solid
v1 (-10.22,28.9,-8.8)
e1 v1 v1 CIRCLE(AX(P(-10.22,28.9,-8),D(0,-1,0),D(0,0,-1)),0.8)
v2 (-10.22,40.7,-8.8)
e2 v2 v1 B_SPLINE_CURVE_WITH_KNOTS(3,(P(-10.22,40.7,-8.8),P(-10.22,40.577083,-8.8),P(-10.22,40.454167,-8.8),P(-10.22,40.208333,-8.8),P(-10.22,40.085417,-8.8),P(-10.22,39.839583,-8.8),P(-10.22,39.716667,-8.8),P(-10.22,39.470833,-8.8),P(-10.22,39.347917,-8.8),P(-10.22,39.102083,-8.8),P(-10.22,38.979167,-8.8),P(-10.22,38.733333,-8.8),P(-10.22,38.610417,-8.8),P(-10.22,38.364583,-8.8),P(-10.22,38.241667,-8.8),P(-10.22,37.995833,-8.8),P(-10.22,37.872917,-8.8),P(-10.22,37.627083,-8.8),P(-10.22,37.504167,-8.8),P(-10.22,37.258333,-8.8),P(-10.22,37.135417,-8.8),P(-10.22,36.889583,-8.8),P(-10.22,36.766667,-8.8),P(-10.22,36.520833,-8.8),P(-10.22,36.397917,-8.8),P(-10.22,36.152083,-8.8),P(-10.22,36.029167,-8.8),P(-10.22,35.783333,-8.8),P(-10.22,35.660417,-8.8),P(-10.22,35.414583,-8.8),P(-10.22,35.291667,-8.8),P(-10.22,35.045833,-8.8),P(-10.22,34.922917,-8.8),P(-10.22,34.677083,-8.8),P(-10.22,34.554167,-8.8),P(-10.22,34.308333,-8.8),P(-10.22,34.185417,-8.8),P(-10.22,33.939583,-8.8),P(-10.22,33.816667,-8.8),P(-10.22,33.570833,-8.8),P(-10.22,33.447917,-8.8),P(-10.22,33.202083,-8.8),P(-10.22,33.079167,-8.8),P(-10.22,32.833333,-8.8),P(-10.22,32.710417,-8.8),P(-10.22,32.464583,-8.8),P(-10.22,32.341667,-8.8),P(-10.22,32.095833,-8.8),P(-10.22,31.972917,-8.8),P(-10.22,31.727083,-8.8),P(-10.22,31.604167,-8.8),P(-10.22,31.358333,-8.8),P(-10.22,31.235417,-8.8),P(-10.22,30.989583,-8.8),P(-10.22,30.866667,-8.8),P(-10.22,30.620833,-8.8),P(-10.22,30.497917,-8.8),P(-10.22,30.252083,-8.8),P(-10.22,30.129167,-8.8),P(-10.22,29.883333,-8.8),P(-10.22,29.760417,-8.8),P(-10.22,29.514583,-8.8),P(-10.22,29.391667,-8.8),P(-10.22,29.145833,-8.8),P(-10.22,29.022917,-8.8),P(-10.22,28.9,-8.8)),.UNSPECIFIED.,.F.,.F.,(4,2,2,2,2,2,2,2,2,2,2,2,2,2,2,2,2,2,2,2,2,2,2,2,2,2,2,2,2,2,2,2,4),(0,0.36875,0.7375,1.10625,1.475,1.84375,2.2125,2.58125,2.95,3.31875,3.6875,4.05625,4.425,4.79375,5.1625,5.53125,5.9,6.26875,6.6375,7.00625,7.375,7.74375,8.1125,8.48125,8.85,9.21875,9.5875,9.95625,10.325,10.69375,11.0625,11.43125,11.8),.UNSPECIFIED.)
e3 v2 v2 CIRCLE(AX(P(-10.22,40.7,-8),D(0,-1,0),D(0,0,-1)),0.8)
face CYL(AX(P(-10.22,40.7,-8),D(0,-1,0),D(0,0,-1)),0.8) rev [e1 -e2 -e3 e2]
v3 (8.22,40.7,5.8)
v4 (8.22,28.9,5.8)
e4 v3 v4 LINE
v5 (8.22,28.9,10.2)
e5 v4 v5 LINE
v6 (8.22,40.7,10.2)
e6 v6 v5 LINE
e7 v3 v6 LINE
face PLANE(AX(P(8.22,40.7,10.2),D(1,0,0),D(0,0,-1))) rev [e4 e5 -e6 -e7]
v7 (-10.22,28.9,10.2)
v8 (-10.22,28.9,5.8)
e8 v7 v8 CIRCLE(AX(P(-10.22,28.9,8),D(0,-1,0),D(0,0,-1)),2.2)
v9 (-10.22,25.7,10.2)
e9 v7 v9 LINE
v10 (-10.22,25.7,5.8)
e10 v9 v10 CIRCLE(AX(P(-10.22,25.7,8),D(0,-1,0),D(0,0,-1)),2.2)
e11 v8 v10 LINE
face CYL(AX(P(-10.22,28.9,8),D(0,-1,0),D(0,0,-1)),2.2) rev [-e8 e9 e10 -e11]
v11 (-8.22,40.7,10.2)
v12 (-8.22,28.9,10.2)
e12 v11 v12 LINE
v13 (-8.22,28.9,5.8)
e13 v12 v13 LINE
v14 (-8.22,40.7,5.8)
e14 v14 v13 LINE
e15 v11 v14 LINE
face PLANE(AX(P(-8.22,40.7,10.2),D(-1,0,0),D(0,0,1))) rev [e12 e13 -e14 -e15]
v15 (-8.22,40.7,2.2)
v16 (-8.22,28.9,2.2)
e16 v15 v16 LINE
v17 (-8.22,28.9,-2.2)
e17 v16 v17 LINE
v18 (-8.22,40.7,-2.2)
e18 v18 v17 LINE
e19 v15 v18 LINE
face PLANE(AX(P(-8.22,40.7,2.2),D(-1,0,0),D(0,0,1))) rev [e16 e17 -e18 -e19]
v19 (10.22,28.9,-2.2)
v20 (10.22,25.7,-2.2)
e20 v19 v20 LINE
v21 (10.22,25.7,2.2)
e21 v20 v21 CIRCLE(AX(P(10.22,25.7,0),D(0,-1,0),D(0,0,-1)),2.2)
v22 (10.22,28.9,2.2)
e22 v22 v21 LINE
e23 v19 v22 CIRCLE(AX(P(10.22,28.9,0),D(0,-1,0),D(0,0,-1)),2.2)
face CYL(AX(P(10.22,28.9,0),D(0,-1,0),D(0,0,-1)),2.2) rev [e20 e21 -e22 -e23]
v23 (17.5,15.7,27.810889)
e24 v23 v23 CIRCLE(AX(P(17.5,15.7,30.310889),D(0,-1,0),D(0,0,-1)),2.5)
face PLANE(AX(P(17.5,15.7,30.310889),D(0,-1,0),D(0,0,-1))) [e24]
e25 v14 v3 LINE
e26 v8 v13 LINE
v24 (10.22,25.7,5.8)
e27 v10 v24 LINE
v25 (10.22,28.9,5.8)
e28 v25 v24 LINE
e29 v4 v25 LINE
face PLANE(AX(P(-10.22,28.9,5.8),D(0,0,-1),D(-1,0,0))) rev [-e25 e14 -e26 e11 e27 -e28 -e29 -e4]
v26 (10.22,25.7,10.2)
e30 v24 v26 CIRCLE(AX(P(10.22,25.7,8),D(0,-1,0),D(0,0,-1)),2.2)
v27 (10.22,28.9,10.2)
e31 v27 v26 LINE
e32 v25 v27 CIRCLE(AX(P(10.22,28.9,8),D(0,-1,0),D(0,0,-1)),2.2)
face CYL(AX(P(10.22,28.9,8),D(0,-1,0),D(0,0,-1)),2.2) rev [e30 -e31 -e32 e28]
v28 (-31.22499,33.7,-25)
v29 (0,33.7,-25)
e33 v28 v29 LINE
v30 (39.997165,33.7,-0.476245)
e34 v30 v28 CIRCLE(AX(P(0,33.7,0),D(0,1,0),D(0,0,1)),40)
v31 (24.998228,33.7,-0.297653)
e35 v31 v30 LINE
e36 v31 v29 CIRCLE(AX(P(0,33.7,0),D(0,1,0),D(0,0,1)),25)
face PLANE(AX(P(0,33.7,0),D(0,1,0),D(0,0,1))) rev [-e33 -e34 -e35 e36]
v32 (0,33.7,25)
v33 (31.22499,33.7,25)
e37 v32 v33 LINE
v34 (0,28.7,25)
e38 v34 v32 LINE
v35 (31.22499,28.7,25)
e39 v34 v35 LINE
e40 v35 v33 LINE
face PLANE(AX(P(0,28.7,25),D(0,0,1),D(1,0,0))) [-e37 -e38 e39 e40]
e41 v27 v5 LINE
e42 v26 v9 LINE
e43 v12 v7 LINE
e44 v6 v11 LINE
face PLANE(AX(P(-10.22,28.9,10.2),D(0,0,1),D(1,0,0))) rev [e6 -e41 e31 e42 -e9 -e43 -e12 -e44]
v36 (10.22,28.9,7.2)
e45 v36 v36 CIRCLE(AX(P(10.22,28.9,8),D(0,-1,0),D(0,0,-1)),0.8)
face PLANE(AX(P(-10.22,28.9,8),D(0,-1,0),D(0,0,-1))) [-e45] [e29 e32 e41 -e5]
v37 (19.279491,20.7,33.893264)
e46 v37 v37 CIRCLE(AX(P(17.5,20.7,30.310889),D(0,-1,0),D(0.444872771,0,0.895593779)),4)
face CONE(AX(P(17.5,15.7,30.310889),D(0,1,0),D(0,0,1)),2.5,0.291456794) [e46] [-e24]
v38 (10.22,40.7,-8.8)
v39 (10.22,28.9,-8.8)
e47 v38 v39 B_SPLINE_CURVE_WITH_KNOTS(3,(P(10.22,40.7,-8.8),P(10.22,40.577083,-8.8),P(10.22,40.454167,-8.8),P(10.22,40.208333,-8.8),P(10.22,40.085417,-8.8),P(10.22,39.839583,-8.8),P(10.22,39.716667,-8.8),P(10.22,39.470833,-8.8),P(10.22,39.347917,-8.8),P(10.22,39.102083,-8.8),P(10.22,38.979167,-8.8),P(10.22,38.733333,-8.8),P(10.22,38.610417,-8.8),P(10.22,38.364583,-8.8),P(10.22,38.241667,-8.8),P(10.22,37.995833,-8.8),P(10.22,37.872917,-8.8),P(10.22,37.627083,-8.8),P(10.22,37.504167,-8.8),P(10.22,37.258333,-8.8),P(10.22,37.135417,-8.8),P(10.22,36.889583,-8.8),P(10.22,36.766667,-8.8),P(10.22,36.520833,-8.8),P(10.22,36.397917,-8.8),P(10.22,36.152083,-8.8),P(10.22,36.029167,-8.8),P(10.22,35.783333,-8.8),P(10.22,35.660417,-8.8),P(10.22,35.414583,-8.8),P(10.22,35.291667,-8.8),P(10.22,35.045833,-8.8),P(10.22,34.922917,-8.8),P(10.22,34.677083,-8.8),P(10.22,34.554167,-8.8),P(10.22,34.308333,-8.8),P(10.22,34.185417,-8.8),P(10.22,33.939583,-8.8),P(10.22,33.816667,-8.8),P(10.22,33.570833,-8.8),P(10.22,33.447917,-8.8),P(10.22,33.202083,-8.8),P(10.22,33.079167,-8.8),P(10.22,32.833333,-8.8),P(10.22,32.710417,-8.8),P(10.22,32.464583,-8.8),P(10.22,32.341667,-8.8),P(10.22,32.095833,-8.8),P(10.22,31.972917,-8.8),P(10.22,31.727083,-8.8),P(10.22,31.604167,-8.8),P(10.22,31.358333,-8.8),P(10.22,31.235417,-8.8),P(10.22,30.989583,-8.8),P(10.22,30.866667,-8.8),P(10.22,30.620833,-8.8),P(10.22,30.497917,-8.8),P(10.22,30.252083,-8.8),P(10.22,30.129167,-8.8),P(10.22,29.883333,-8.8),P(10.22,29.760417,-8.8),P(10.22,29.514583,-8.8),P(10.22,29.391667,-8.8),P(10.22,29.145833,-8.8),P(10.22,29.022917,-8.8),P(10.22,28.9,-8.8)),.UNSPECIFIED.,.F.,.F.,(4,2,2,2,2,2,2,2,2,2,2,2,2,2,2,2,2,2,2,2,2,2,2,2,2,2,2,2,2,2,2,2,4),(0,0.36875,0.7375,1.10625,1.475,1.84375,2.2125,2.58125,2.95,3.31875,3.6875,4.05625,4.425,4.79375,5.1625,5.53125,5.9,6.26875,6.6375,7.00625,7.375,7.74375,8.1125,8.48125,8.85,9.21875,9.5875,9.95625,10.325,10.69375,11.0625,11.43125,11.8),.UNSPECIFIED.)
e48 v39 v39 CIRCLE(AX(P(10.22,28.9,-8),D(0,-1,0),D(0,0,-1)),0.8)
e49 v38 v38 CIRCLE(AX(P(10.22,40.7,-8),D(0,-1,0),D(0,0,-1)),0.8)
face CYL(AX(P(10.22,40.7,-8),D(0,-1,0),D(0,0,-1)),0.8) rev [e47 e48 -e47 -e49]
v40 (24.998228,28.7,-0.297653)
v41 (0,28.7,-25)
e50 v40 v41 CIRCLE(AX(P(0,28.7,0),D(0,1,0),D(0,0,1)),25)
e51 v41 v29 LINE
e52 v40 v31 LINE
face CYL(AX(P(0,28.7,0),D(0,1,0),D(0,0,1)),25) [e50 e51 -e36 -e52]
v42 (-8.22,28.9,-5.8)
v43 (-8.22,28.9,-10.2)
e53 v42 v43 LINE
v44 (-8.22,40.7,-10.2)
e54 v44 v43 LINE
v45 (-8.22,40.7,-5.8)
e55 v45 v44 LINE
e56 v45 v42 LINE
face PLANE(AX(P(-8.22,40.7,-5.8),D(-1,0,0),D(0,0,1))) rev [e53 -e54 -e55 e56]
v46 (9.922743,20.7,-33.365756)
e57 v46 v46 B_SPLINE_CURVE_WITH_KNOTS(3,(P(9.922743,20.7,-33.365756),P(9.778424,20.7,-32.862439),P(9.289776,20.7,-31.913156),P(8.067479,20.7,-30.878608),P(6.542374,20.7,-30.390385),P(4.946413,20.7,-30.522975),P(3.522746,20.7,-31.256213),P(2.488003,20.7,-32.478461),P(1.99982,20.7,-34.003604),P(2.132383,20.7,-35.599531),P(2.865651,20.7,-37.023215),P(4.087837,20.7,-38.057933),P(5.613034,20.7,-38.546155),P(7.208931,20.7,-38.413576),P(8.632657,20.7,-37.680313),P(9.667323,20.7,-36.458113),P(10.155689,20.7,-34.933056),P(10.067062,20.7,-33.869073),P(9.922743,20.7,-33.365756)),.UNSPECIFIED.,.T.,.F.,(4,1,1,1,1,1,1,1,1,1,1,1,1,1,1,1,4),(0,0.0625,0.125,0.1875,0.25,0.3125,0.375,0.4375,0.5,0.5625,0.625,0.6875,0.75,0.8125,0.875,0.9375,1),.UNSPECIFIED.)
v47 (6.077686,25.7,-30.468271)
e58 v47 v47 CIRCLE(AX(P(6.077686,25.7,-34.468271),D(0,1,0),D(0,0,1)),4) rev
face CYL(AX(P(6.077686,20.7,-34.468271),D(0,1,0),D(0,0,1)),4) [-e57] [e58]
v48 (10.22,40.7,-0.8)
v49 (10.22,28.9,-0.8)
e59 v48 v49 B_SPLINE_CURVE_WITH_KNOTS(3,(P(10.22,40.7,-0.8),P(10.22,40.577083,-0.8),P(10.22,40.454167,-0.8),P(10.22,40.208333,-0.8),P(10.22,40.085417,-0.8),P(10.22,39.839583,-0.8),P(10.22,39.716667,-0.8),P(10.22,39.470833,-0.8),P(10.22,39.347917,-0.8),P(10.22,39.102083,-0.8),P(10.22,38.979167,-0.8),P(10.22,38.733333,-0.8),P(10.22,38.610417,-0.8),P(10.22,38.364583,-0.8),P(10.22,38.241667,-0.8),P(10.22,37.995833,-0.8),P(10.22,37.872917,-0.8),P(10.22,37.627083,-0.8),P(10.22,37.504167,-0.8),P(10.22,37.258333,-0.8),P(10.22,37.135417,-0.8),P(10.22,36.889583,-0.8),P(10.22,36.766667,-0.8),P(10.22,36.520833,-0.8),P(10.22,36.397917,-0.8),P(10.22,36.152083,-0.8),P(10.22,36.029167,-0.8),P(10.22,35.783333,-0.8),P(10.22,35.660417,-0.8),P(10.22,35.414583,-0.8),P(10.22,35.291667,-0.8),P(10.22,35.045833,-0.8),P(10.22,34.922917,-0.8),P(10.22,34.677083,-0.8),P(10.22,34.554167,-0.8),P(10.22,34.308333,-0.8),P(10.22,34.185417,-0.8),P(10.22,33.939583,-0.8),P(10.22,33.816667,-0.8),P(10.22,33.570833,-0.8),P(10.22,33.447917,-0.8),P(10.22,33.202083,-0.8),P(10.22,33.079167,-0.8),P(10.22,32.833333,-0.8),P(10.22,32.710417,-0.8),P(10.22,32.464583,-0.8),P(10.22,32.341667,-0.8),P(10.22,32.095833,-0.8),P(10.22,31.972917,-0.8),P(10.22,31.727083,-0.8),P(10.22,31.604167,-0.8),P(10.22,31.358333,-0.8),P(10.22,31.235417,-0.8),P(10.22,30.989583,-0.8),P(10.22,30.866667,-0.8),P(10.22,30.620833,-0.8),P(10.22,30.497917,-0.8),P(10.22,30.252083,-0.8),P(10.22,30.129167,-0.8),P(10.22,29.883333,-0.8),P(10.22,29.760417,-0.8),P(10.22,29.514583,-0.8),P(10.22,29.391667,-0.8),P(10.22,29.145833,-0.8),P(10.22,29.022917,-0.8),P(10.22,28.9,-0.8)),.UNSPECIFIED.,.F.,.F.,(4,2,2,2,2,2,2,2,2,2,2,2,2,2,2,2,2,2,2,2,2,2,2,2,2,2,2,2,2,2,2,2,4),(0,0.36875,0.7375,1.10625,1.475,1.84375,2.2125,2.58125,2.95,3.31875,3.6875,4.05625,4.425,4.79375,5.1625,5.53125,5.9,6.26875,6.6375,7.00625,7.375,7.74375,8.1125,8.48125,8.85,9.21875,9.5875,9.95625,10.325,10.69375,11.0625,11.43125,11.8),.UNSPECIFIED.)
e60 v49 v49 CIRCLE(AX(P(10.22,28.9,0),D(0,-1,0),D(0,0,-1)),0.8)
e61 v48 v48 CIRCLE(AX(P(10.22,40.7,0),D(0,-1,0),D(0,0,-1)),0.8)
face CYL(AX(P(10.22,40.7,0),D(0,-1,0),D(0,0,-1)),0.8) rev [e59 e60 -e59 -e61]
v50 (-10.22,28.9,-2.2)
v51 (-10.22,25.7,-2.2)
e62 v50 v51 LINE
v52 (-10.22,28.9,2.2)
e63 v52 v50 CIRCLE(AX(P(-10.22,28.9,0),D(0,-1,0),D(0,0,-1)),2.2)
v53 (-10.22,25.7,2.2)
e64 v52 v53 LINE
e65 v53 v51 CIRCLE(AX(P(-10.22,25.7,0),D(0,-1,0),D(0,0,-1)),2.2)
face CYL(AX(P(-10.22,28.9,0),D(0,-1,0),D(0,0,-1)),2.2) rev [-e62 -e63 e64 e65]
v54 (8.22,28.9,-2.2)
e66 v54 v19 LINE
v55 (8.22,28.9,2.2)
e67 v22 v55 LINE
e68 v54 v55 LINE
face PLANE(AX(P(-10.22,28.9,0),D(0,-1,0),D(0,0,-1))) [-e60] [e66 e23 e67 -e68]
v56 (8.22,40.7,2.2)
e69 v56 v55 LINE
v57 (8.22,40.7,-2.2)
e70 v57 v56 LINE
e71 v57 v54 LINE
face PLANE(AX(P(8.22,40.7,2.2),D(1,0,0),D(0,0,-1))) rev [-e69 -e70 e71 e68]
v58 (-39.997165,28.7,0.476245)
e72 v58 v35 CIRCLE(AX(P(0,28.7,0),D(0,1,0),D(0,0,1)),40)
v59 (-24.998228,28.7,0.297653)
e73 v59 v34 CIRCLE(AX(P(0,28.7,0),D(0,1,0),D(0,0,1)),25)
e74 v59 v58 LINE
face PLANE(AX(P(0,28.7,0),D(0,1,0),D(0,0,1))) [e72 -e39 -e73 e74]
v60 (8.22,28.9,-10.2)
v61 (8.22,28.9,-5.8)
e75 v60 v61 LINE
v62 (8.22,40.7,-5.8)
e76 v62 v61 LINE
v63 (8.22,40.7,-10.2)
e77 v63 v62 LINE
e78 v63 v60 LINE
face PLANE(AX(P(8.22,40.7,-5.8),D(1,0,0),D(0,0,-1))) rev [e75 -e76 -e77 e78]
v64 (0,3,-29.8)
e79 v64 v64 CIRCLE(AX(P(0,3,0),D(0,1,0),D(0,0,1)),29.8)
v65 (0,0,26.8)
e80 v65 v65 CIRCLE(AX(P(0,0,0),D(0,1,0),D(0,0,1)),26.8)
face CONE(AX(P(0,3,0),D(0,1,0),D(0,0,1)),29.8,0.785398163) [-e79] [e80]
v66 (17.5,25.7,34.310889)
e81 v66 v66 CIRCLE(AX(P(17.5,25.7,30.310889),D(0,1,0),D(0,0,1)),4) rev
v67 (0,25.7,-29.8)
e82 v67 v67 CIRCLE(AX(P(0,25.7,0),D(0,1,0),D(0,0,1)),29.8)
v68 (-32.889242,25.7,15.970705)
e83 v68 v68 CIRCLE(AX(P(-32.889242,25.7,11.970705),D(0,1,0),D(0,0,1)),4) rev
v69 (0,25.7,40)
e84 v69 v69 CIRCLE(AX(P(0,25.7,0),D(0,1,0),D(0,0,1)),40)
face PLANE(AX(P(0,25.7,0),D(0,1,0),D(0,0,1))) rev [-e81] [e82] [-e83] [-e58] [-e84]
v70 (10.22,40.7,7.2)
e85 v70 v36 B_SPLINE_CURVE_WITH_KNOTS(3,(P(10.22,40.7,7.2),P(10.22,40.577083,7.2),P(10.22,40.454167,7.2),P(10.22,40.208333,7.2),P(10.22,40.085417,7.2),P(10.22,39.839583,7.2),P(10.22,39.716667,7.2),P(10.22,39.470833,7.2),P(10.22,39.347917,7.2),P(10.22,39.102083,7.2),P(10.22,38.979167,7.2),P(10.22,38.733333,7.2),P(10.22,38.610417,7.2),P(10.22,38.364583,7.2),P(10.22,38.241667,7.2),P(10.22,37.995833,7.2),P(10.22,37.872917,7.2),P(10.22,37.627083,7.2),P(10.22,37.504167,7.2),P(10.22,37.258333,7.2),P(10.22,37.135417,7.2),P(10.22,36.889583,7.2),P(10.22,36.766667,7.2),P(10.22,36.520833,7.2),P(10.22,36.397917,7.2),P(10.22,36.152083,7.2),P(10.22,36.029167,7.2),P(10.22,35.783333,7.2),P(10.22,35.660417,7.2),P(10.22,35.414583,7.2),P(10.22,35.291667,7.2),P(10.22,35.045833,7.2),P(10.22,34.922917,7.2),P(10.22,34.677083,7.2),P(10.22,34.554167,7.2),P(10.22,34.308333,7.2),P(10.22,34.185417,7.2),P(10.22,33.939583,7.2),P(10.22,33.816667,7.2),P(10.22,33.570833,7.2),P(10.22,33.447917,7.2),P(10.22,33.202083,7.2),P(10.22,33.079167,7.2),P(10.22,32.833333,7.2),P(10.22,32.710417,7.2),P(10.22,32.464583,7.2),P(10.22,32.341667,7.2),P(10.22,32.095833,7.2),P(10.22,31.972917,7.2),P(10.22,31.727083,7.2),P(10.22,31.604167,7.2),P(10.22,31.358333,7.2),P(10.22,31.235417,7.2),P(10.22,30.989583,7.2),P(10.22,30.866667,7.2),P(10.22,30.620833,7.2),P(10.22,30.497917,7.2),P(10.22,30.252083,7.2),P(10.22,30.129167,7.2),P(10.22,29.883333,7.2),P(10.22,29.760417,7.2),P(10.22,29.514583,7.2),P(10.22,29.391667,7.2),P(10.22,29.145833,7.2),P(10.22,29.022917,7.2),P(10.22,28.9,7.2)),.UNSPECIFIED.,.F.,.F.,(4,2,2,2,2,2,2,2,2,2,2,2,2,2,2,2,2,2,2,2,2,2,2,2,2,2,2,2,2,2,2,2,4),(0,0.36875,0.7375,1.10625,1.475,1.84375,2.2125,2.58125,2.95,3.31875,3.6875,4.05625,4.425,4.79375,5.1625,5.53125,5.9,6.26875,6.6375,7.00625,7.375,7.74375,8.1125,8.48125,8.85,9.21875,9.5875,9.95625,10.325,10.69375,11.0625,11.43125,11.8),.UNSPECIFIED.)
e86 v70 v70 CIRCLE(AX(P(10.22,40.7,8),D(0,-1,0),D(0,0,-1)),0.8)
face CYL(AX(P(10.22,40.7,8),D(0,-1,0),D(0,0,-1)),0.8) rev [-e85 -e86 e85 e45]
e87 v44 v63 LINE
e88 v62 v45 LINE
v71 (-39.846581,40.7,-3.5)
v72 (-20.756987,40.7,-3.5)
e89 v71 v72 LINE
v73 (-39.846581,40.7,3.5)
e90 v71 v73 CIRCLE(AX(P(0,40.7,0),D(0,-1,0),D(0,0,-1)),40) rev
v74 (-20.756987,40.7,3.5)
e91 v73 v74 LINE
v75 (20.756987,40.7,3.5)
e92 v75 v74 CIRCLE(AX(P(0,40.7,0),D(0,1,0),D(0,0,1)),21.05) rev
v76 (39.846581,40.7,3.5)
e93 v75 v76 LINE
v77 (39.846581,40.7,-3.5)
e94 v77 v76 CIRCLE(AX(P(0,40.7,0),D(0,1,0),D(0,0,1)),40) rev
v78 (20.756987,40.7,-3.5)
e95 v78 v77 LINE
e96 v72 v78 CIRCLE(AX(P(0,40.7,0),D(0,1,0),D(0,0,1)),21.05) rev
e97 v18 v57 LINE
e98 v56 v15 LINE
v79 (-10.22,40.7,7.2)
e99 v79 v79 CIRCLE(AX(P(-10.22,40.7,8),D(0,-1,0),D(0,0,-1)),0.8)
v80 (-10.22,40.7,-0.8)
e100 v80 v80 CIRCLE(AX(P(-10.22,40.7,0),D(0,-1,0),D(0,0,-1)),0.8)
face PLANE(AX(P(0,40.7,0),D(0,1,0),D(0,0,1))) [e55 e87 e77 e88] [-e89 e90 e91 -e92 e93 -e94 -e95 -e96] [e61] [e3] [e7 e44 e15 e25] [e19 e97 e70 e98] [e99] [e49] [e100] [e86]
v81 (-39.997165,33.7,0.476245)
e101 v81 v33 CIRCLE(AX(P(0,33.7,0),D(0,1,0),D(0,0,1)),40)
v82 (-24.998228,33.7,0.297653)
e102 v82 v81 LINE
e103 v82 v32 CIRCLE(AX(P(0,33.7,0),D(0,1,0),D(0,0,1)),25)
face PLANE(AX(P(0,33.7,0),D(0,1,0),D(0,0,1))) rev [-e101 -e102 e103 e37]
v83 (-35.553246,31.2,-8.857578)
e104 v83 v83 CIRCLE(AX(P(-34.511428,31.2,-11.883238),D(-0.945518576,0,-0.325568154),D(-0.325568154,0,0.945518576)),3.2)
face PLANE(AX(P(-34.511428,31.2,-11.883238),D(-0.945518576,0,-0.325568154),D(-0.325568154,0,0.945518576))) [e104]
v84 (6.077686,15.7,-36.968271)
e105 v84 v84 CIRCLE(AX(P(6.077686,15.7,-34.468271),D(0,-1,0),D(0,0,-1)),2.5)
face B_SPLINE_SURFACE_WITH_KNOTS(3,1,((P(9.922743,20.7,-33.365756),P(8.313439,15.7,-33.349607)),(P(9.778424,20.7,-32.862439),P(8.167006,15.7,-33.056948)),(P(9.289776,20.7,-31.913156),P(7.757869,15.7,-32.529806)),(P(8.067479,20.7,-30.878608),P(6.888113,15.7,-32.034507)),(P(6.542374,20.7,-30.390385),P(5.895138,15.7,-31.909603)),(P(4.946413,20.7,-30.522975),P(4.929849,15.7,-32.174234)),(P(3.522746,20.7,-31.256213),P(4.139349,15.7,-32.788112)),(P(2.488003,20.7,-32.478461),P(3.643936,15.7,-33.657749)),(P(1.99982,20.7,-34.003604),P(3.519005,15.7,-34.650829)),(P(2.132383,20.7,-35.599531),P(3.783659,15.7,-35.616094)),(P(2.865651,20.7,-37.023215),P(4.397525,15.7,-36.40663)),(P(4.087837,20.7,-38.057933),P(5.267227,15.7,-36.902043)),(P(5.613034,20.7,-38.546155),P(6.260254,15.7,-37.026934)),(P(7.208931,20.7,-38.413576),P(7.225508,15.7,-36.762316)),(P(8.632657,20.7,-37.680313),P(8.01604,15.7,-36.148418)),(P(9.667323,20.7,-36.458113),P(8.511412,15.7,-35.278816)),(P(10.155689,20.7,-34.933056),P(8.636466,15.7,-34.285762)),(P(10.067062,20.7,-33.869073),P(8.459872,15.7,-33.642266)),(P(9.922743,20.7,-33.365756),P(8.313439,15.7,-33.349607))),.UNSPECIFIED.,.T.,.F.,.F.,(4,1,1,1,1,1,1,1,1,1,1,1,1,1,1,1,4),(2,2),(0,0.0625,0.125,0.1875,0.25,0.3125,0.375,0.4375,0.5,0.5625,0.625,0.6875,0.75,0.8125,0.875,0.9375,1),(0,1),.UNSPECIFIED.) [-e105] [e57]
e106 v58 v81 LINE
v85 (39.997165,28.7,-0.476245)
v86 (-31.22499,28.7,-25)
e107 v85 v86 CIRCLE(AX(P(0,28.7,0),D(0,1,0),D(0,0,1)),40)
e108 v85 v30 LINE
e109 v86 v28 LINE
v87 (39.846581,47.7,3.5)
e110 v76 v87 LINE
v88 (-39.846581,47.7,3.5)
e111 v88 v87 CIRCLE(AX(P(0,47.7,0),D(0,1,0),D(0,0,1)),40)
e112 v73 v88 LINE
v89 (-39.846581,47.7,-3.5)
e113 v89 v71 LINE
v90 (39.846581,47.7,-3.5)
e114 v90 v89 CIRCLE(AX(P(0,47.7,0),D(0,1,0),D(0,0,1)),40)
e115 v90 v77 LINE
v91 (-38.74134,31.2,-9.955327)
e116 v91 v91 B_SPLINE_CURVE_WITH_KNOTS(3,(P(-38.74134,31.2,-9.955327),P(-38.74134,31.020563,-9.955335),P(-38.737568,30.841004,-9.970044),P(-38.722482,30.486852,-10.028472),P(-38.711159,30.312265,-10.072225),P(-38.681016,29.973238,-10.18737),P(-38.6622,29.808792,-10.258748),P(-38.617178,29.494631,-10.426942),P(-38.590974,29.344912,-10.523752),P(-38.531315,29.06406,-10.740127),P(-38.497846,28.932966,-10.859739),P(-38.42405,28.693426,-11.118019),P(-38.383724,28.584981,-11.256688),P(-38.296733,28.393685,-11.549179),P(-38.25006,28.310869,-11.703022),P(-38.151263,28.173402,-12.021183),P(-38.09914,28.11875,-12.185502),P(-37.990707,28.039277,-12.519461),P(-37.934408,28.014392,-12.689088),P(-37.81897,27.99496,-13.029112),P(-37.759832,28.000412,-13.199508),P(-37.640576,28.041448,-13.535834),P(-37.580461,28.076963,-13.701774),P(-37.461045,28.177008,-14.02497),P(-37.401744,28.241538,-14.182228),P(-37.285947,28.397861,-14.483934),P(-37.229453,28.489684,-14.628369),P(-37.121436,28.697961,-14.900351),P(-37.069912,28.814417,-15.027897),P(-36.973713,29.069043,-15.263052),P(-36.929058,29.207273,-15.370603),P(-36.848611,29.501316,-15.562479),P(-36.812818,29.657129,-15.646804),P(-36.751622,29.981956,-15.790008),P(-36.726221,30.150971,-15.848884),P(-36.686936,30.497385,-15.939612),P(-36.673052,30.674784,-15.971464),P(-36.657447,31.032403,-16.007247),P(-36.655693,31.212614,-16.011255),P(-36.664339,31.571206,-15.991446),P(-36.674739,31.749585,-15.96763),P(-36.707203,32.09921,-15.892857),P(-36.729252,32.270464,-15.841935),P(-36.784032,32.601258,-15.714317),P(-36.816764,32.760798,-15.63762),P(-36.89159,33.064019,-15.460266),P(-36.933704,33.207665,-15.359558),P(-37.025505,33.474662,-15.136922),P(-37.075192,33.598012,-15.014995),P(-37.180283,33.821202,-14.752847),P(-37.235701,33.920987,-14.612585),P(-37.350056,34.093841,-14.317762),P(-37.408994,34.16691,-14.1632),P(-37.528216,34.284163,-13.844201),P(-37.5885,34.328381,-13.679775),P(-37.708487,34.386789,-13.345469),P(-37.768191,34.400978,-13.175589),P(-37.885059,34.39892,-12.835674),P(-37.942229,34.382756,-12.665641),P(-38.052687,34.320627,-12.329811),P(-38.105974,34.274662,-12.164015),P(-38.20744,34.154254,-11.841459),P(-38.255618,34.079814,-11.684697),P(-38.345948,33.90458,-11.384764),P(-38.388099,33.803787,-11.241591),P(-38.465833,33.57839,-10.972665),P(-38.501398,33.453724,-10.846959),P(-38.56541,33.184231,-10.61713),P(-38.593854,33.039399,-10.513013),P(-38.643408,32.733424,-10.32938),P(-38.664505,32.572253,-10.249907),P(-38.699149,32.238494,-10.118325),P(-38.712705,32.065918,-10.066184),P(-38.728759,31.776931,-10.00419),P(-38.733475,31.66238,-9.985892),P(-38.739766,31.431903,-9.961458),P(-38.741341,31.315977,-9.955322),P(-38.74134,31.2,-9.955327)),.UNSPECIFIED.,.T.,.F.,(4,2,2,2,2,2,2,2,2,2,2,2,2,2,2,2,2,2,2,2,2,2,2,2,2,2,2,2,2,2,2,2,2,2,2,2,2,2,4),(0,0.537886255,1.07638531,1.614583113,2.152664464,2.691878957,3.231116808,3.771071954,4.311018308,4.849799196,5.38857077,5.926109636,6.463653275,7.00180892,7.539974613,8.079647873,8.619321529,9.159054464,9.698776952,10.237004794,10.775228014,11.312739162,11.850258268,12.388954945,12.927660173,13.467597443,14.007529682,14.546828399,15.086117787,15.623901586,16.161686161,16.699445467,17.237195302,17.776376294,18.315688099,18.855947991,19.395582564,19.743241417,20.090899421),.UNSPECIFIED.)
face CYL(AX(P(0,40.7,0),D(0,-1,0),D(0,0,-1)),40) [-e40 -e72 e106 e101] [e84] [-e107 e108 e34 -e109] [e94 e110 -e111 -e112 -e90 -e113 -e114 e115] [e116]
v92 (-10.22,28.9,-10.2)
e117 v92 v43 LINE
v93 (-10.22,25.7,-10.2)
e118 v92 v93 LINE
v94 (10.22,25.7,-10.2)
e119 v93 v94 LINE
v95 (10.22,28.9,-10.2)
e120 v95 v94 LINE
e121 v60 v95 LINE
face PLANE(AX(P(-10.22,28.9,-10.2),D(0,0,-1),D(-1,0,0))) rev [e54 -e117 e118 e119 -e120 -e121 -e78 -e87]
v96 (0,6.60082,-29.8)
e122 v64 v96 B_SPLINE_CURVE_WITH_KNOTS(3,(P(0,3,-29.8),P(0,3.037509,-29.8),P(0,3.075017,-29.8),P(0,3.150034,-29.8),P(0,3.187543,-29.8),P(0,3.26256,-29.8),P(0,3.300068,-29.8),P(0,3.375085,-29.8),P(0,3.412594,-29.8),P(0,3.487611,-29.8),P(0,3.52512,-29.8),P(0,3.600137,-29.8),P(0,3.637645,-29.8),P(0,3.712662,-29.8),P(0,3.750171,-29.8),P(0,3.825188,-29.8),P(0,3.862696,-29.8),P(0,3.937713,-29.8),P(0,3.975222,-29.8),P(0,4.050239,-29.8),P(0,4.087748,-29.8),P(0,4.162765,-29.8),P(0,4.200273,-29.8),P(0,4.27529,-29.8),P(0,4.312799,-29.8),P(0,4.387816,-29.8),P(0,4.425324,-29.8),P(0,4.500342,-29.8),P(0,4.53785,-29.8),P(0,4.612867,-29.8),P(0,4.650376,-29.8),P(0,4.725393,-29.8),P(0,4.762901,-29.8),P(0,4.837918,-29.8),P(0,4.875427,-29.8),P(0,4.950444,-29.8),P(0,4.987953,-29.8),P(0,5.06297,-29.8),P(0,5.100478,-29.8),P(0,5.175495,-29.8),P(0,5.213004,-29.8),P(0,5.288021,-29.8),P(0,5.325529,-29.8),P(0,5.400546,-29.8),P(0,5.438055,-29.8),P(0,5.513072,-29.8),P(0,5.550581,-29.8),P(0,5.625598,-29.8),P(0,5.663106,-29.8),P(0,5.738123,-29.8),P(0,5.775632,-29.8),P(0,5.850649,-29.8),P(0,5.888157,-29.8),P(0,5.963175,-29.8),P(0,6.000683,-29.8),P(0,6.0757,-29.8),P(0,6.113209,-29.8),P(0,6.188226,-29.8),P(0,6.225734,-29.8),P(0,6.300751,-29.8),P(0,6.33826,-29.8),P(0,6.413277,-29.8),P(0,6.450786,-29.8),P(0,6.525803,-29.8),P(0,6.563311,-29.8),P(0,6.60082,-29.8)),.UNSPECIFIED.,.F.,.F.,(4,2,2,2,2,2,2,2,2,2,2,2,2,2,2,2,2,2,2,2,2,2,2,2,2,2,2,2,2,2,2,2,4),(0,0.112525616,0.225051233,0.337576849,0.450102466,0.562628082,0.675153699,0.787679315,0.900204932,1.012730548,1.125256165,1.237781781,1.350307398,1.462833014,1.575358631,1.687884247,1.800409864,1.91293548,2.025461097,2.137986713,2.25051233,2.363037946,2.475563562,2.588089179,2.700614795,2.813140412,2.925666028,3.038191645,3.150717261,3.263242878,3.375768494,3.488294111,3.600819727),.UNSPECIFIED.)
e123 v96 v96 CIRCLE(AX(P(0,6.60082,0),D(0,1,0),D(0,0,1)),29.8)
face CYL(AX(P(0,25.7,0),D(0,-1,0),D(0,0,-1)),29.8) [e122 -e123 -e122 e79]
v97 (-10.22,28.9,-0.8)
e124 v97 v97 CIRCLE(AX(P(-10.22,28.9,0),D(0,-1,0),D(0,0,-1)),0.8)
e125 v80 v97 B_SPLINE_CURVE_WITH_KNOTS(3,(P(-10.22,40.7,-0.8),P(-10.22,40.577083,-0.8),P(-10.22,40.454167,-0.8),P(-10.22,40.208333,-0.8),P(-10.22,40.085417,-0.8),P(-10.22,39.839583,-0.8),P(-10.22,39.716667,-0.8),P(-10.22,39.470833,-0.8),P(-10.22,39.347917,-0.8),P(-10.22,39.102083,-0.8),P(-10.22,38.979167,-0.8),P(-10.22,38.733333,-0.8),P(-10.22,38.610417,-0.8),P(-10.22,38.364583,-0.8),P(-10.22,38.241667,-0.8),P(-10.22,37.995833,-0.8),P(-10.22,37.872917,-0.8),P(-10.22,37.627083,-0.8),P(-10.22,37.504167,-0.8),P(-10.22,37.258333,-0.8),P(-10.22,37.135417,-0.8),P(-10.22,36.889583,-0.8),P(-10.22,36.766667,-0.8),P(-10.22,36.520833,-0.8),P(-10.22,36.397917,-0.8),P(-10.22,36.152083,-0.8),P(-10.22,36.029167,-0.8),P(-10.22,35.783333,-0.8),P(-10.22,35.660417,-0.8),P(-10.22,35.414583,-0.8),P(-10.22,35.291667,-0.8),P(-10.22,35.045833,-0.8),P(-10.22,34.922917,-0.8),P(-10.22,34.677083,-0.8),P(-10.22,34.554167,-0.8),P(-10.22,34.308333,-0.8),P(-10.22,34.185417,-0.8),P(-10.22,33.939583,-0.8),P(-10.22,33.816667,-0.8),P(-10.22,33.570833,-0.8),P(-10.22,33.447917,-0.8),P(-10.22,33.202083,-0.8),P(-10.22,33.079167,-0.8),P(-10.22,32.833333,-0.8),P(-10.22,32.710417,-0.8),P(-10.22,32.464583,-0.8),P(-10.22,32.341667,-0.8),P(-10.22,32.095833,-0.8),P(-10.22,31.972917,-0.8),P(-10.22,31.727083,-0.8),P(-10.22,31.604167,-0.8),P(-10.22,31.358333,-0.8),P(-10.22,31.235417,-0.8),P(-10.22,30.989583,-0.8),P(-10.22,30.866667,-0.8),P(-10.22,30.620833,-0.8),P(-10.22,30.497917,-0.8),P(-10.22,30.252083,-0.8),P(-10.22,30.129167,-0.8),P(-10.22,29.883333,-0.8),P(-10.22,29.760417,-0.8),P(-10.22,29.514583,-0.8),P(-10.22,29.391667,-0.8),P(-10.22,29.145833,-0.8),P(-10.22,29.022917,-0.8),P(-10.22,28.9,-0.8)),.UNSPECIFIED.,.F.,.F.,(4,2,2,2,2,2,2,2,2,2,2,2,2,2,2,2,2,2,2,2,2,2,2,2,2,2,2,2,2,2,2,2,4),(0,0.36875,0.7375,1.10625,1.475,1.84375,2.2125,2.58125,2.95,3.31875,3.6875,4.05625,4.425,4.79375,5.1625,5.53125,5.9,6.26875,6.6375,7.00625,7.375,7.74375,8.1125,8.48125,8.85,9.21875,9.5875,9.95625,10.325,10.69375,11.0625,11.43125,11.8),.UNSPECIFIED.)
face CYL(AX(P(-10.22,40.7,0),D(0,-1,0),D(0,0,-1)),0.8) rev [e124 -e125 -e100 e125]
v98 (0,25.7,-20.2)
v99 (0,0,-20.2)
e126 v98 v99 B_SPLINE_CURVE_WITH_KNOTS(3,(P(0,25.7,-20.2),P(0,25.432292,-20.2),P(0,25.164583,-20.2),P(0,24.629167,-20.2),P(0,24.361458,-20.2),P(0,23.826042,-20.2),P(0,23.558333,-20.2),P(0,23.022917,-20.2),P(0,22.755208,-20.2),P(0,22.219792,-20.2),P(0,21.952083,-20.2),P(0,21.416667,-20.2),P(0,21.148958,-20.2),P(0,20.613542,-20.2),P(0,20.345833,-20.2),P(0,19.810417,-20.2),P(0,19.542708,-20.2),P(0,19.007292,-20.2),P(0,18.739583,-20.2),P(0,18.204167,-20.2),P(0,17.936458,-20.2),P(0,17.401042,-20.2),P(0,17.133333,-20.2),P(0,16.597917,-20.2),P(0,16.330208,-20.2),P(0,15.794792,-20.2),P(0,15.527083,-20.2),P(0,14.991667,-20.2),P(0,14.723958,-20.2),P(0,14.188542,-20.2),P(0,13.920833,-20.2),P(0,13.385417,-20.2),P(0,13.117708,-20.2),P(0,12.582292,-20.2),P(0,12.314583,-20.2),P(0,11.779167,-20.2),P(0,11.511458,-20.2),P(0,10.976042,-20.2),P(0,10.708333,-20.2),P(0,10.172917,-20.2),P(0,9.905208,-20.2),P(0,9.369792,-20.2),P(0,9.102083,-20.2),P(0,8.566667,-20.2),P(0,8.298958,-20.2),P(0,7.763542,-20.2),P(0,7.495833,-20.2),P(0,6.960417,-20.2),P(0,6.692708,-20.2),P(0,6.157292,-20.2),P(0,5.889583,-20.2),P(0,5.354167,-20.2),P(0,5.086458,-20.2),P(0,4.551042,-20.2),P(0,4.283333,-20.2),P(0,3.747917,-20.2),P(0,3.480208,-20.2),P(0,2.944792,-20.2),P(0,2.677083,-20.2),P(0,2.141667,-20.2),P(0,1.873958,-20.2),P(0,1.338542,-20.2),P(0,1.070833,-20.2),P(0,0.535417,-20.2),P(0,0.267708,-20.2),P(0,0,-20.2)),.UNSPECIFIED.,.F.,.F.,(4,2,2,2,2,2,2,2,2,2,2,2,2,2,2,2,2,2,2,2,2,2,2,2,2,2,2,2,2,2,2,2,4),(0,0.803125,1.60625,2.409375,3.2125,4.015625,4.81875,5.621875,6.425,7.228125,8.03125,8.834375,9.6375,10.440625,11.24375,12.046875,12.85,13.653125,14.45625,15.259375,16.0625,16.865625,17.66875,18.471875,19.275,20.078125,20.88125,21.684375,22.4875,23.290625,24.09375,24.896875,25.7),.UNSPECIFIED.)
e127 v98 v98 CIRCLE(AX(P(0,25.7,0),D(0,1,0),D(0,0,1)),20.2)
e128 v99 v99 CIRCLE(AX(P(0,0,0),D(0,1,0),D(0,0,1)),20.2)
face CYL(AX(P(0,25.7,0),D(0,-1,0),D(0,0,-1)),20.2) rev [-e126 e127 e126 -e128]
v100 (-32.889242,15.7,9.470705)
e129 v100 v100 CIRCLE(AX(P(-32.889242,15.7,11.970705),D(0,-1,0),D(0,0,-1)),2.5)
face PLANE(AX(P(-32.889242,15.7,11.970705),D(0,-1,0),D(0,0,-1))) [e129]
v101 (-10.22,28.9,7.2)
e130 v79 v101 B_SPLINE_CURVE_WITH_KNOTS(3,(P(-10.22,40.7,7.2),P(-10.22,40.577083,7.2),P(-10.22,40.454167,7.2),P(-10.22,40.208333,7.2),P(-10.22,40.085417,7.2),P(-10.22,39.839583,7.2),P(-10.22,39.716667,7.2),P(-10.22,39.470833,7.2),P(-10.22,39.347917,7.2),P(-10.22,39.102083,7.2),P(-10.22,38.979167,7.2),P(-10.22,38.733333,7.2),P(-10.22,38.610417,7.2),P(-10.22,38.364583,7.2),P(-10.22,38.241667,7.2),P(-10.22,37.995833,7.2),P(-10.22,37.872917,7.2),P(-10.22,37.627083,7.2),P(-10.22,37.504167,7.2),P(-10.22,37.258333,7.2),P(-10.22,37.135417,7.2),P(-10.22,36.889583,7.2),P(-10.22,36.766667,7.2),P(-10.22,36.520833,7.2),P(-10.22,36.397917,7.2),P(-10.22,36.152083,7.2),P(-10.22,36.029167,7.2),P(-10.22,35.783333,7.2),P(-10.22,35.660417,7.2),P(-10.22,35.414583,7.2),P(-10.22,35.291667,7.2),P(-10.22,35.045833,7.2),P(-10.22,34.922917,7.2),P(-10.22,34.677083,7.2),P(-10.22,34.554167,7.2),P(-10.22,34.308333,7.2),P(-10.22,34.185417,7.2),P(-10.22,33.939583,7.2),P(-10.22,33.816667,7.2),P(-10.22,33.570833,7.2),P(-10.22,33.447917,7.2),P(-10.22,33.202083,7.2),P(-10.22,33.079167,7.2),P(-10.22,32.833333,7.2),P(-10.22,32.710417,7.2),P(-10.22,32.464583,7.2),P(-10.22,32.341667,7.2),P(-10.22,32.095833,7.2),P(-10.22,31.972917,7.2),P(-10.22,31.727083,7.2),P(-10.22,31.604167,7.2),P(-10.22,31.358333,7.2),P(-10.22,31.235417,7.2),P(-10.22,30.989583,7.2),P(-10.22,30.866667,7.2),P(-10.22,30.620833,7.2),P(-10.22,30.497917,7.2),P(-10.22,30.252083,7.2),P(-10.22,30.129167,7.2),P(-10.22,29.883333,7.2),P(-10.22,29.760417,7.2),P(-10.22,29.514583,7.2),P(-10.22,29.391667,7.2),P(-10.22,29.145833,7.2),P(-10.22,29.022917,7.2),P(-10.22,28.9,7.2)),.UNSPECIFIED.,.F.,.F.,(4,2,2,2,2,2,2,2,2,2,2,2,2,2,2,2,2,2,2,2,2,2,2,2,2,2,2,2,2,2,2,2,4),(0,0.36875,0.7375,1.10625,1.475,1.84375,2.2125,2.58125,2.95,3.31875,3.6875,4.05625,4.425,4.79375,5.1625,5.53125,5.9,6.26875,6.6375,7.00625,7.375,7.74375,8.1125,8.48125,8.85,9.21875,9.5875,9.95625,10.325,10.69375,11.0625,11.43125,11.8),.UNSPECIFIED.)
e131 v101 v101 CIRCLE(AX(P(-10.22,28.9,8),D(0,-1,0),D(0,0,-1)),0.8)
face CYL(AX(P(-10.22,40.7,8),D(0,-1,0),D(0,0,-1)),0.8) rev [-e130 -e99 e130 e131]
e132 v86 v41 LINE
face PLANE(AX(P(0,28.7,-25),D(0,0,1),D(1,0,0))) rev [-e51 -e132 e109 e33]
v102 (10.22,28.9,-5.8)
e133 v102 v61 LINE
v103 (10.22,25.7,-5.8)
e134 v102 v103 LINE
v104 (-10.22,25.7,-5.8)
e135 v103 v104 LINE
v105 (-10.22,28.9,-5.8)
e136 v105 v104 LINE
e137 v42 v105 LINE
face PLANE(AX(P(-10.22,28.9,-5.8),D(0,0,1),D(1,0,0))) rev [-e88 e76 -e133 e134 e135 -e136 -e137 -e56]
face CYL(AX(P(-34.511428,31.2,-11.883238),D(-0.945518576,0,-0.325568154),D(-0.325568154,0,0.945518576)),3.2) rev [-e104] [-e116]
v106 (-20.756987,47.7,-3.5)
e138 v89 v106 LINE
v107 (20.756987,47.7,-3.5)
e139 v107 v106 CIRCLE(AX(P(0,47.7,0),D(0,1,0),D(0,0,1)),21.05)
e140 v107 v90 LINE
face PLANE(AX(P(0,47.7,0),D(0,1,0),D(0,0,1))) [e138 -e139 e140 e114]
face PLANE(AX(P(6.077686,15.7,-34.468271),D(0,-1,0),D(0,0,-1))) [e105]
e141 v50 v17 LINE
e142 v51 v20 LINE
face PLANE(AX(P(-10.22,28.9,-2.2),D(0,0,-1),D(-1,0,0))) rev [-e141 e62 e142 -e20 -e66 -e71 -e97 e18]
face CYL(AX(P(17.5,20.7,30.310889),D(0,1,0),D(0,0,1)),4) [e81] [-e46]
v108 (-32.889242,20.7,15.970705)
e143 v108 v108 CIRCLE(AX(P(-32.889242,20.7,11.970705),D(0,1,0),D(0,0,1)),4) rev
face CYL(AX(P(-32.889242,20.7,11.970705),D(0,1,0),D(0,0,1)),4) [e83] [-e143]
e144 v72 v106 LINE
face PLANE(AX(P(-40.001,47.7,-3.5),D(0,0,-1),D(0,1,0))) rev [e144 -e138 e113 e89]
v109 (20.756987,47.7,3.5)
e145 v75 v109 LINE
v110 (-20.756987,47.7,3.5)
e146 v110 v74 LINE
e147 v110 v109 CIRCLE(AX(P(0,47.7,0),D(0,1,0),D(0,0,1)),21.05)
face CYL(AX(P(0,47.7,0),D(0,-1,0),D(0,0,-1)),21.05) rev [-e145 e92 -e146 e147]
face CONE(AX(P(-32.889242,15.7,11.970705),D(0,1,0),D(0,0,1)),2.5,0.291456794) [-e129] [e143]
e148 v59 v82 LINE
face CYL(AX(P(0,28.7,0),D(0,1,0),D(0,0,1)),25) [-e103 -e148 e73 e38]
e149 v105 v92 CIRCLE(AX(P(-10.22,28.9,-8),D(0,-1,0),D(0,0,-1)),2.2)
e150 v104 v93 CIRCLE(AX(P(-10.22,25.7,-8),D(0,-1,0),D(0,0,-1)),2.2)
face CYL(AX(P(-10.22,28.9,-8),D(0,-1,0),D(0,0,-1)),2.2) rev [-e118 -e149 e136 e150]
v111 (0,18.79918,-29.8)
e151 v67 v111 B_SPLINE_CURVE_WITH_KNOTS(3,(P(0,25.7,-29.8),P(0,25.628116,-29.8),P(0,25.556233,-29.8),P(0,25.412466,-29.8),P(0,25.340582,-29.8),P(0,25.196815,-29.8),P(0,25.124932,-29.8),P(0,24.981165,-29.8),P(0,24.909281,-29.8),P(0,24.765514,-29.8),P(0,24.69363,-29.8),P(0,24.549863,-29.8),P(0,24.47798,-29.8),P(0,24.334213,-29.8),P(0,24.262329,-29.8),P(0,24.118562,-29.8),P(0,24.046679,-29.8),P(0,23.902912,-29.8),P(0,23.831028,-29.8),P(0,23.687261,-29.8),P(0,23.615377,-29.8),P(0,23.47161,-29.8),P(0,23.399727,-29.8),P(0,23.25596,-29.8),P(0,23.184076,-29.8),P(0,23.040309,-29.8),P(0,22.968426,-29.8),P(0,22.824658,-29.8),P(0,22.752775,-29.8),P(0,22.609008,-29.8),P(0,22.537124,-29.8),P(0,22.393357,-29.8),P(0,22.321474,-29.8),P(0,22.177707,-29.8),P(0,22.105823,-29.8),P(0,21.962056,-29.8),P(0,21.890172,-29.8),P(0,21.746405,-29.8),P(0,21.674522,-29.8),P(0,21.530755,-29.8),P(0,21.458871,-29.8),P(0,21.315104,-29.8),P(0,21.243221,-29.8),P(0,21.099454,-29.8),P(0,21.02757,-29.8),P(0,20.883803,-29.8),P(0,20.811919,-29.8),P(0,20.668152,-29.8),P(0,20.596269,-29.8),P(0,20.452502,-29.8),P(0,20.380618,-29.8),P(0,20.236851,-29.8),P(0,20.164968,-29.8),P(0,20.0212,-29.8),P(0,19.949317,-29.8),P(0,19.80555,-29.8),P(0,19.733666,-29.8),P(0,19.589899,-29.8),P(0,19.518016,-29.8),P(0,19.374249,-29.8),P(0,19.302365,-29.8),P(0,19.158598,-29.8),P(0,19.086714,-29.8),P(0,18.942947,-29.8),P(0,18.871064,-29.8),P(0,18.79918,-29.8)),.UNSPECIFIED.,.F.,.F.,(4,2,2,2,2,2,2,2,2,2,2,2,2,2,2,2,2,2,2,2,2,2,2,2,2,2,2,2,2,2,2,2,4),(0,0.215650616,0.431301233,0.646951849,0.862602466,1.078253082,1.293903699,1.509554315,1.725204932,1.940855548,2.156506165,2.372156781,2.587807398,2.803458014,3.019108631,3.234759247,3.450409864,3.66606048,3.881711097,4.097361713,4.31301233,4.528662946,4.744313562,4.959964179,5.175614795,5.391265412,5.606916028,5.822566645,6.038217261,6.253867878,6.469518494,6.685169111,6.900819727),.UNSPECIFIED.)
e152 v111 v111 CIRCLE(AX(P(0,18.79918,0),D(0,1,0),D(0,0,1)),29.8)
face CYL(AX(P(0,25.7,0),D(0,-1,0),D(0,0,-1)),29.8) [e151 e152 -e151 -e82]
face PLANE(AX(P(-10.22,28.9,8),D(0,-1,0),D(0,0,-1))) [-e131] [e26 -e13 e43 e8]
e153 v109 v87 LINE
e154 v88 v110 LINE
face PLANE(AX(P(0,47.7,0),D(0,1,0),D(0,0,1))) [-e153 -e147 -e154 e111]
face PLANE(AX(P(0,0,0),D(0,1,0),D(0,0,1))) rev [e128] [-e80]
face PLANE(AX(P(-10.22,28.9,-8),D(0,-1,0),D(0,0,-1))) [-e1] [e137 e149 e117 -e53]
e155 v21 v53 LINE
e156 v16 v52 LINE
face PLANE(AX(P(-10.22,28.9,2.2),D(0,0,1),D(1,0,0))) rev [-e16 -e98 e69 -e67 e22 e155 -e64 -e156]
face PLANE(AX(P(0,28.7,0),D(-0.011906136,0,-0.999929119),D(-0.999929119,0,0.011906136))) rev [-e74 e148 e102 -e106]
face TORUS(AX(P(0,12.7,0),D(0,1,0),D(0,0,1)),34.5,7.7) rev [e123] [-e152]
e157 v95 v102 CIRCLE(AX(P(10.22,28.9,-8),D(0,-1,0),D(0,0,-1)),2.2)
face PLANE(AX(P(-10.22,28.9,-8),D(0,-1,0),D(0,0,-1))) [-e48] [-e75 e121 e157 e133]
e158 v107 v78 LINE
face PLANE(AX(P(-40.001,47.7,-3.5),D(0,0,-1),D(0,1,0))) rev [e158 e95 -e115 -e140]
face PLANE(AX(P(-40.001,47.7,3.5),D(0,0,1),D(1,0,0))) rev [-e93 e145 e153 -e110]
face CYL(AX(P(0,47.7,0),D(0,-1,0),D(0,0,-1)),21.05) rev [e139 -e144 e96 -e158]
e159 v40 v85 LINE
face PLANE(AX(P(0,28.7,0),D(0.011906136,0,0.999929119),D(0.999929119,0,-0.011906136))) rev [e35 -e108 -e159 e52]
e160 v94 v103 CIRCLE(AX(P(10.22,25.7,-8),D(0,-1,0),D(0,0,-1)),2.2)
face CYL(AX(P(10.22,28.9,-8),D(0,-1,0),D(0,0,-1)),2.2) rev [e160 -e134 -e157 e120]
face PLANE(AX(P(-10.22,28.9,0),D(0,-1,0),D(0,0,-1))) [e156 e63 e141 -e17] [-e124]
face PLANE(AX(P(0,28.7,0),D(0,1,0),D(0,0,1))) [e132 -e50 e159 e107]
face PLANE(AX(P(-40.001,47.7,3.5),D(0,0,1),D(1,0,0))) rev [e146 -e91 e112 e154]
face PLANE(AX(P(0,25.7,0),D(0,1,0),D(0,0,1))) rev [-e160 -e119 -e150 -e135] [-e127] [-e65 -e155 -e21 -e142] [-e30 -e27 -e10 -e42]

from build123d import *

# Parameters (mm, degrees)
SKETCH1_R                            = 29.8
SKETCH1_R_2                          = 20.2
BOSS_EXTRUDE1_DEPTH                  = 25.7
SKETCH3_R                            = 40
BOSS_EXTRUDE2_DEPTH                  = 15
SKETCH4_R                            = 4
BOSS_EXTRUDE3_DEPTH                  = 5
SKETCH6_R                            = 2.5
CUT_EXTRUDE1_START                   = -12
CUT_EXTRUDE1_DEPTH                   = 5
CUT_EXTRUDE6_DEPTH                   = 3.2
SKETCH15_W                           = 16.44
SKETCH15_H                           = 4.4
CUT_EXTRUDE7_DEPTH                   = 63.132841557
SKETCH16_R                           = 0.8
CUT_EXTRUDE8_DEPTH                   = 64.523302811
CUT_EXTRUDE15_START                  = 40
SKETCH25_R                           = 3.2
CUT_EXTRUDE15_DEPTH                  = 3.5
SKETCH20_R                           = 40
SKETCH20_R_2                         = 21.05
BOSS_EXTRUDE4_DEPTH                  = 7
CUT_EXTRUDE17_REACH                  = 75.995
CUT_EXTRUDE17_END_RADIUS             = 40
SKETCH28_W                           = 7
SKETCH28_H                           = 7
CUT_EXTRUDE17_DIRECTION_2_REACH      = 75.995
CUT_EXTRUDE17_DIRECTION_2_END_RADIUS = 40


with BuildPart() as part:
    # Sketch1 → Boss-Extrude1 (new body)
    with BuildSketch(Plane(origin=(0, 0, 0), x_dir=(1, 0, 0), z_dir=(0, 1, 0))):
        with Locations(Location((0, 0, 0), (0, 0, 90))):
            Circle(SKETCH1_R)
        with Locations(Location((0, 0, 0), (0, 0, 90))):
            Circle(SKETCH1_R_2, mode=Mode.SUBTRACT)
    extrude(amount=BOSS_EXTRUDE1_DEPTH)

    # Sketch2 → Cut-Revolve1 (revolve, cut)
    with BuildSketch(Plane.XY, mode=Mode.PRIVATE) as cut_revolve1_sk:
        with BuildLine():
            Line((29.8, 12.7), (29.8, 18.799180273))
            ThreePointArc((29.8, 18.799180273), (27.590586132, 16.098529094), (26.8, 12.7))
            Line((26.8, 12.7), (29.8, 12.7))
        make_face()
        with BuildLine():
            Line((29.8, 6.600819727), (29.8, 12.7))
            Line((29.8, 12.7), (26.8, 12.7))
            ThreePointArc((26.8, 12.7), (27.590586132, 9.301470906), (29.8, 6.600819727))
        make_face()
        Polygon((29.8, 3), (26.8, 0), (29.8, 0), align=None)
    revolve(cut_revolve1_sk.sketch.rotate(Axis((0, 25.7, 0), (0, -1, 0)), 270), axis=Axis((0, 25.7, 0), (0, -1, 0)), mode=Mode.SUBTRACT)

    # Sketch3 → Boss-Extrude2 (add)
    with BuildSketch(Plane(origin=(0, 25.7, 0), x_dir=(1, 0, 0), z_dir=(0, 1, 0))):
        with Locations(Location((0, 0, 0), (0, 0, 270))):
            Circle(SKETCH3_R)
    extrude(amount=BOSS_EXTRUDE2_DEPTH)

    # Sketch4 → Boss-Extrude3 (add)
    with BuildSketch(Plane(origin=(0, 25.7, 0), x_dir=(-1, 0, 0), z_dir=(0, -1, 0))):
        with Locations(Location((-17.5, -30.310889132, 0), (0, 0, 270))):
            Circle(SKETCH4_R)
        with Locations(Location((32.889241728, -11.970705016, 0), (0, 0, 270))):
            Circle(SKETCH4_R)
        with Locations(Location((-6.077686218, 34.468271355, 0), (0, 0, 270))):
            Circle(SKETCH4_R)
    extrude(amount=BOSS_EXTRUDE3_DEPTH)

    # Sketch6 → section 1 of loft1
    with BuildSketch(Plane(origin=(0, 15.7, 0), x_dir=(-1, 0, 0), z_dir=(0, -1, 0)), mode=Mode.PRIVATE) as loft1_s1:
        with Locations((32.889241728, -11.970705016)):
            Circle(SKETCH6_R)
    # loft from a face of the part (loft1)
    loft([part.faces().sort_by_distance((-32.889241728, 20.7, 11.970705016))[0], loft1_s1.sketch])

    # Boundary1: read off the stored shape, not the designer's step
    # Boundary1 outline → Boundary1 (revolve)
    with BuildSketch(Plane(origin=(17.5, 0, 30.310889132), x_dir=(1, 0, 0), z_dir=(0, 0, 1))):
        Polygon((0, 20.7), (0, 15.7), (2.5, 15.7), (4, 20.7), align=None)
    revolve(axis=Axis((17.5, 0, 30.310889132), (0, 1, 0)))

    # Boundary2: read off the stored shape, not the designer's step
    # Boundary2: loft between two sections, ruled curve by curve
    boundary2_from = [
        Edge.make_bspline([(9.922742778, 20.7, -33.365756026), (9.778423859, 20.7, -32.862439299), (9.289775651, 20.7, -31.913155977), (8.067478825, 20.7, -30.878607721), (6.542374051, 20.7, -30.390384874), (4.946413374, 20.7, -30.522974824), (3.522746317, 20.7, -31.256212676), (2.488002725, 20.7, -32.478460941), (1.999820352, 20.7, -34.003603594), (2.132382571, 20.7, -35.599531113), (2.865650923, 20.7, -37.023214684), (4.087837179, 20.7, -38.057933438), (5.613033755, 20.7, -38.546155237), (7.208931106, 20.7, -38.413575903), (8.632657493, 20.7, -37.680313497), (9.667322676, 20.7, -36.45811299), (10.155689167, 20.7, -34.933056337), (10.067061697, 20.7, -33.869072752), (9.922742778, 20.7, -33.365756026)], [0, 0, 0, 0, 0.0625, 0.125, 0.1875, 0.25, 0.3125, 0.375, 0.4375, 0.5, 0.5625, 0.625, 0.6875, 0.75, 0.8125, 0.875, 0.9375, 1, 1, 1, 1], 3),
    ]
    boundary2_to = [
        Edge.make_bspline([(8.313438837, 15.7, -33.349606871), (8.167005998, 15.7, -33.056947538), (7.757868808, 15.7, -32.529805617), (6.88811309, 15.7, -32.034506513), (5.895137902, 15.7, -31.909602819), (4.929849468, 15.7, -32.174234081), (4.139348951, 15.7, -32.788112293), (3.643935799, 15.7, -33.657748526), (3.519005287, 15.7, -34.650828768), (3.783658552, 15.7, -35.616093907), (4.397524642, 15.7, -36.406629525), (5.26722668, 15.7, -36.902042852), (6.260254151, 15.7, -37.026934051), (7.225507947, 15.7, -36.762316146), (8.016039922, 15.7, -36.14841822), (8.511411727, 15.7, -35.27881634), (8.63646584, 15.7, -34.285761617), (8.459871676, 15.7, -33.642266205), (8.313438837, 15.7, -33.349606871)], [0, 0, 0, 0, 0.0625, 0.125, 0.1875, 0.25, 0.3125, 0.375, 0.4375, 0.5, 0.5625, 0.625, 0.6875, 0.75, 0.8125, 0.875, 0.9375, 1, 1, 1, 1], 3),
    ]
    boundary2 = Solid(Shell([*[Face.make_surface_from_curves(boundary2_from[k], boundary2_to[k]) for k in range(1)], Face(Wire(boundary2_from)), Face(Wire(boundary2_to))]))
    add(boundary2)

    # Sketch7 → Cut-Extrude1 (cut)
    with BuildSketch(Plane(origin=(0, 40.7, 0), x_dir=(1, 0, 0), z_dir=(0, 1, 0)).offset(CUT_EXTRUDE1_START)):
        with BuildLine():
            ThreePointArc((31.224989992, 25), (0, 40), (-31.224989992, 25))
            Line((-31.224989992, 25), (0, 25))
            Line((0, 25), (31.224989992, 25))
        make_face()
        with BuildLine():
            Line((-5.8e-08, -25), (-31.224989992, -25))
            ThreePointArc((-31.224989992, -25), (0, -40), (31.224989992, -25))
            Line((31.224989992, -25), (-5.8e-08, -25))
        make_face()
        with BuildLine():
            Line((-19.515618745, -15.625), (-31.224989992, -25))
            Line((-31.224989992, -25), (-5.8e-08, -25))
            ThreePointArc((-5.8e-08, -25), (-10.825317574, -22.534695459), (-19.515618745, -15.625))
        make_face()
        with BuildLine():
            Line((-24.998227986, -0.297653397), (-39.997164778, -0.476245435))
            ThreePointArc((-39.997164778, -0.476245435), (-37.663011922, -13.472102025), (-31.224989992, -25))
            Line((-31.224989992, -25), (-19.515618745, -15.625))
            ThreePointArc((-19.515618745, -15.625), (-23.539382451, -8.420063766), (-24.998227986, -0.297653397))
        make_face()
        with BuildLine():
            ThreePointArc((39.997164778, 0.476245435), (37.663011922, 13.472102025), (31.224989992, 25))
            Line((31.224989992, 25), (19.515618745, 15.625))
            ThreePointArc((19.515618745, 15.625), (23.539382451, 8.420063766), (24.998227986, 0.297653397))
            Line((24.998227986, 0.297653397), (39.997164778, 0.476245435))
        make_face()
        with BuildLine():
            Line((31.224989992, 25), (0, 25))
            ThreePointArc((0, 25), (10.825317547, 22.534695472), (19.515618745, 15.625))
            Line((19.515618745, 15.625), (31.224989992, 25))
        make_face()
    extrude(amount=CUT_EXTRUDE1_DEPTH, mode=Mode.SUBTRACT)

    # Sketch14 → Cut-Extrude6 (cut)
    with BuildSketch(Plane(origin=(0, 25.7, 0), x_dir=(-1, 0, 0), z_dir=(0, -1, 0))):
        with BuildLine():
            Line((10.22, -2.2), (-10.22, -2.2))
            ThreePointArc((-10.22, -2.2), (-12.42, 0), (-10.22, 2.2))
            Line((-10.22, 2.2), (10.22, 2.2))
            ThreePointArc((10.22, 2.2), (12.42, 0), (10.22, -2.2))
        make_face()
        with BuildLine():
            Line((10.22, 10.2), (-10.22, 10.2))
            ThreePointArc((-10.22, 10.2), (-12.42, 8), (-10.22, 5.8))
            Line((-10.22, 5.8), (10.22, 5.8))
            ThreePointArc((10.22, 5.8), (12.42, 8), (10.22, 10.2))
        make_face()
        with BuildLine():
            Line((10.22, -5.8), (-10.22, -5.8))
            ThreePointArc((-10.22, -5.8), (-12.42, -8), (-10.22, -10.2))
            Line((-10.22, -10.2), (10.22, -10.2))
            ThreePointArc((10.22, -10.2), (12.42, -8), (10.22, -5.8))
        make_face()
    extrude(amount=-CUT_EXTRUDE6_DEPTH, mode=Mode.SUBTRACT)

    # Sketch15 → Cut-Extrude7 (cut, through all)
    with BuildSketch(Plane(origin=(0, 25.7, 0), x_dir=(-1, 0, 0), z_dir=(0, -1, 0))):
        Rectangle(SKETCH15_W, SKETCH15_H)
        with Locations((0, -8)):
            Rectangle(SKETCH15_W, SKETCH15_H)
        with Locations((0, 8)):
            Rectangle(SKETCH15_W, SKETCH15_H)
    extrude(amount=-CUT_EXTRUDE7_DEPTH, mode=Mode.SUBTRACT)

    # Sketch16 → Cut-Extrude8 (cut, through all)
    with BuildSketch(Plane(origin=(0, 28.9, 0), x_dir=(-1, 0, 0), z_dir=(0, -1, 0))):
        with Locations(Location((-10.22, -8, 0), (0, 0, 90))):
            Circle(SKETCH16_R)
        with Locations(Location((-10.22, 0, 0), (0, 0, 90))):
            Circle(SKETCH16_R)
        with Locations(Location((-10.22, 8, 0), (0, 0, 90))):
            Circle(SKETCH16_R)
        with Locations(Location((10.22, -8, 0), (0, 0, 90))):
            Circle(SKETCH16_R)
        with Locations(Location((10.22, 0, 0), (0, 0, 90))):
            Circle(SKETCH16_R)
        with Locations(Location((10.22, 8, 0), (0, 0, 90))):
            Circle(SKETCH16_R)
    extrude(amount=-CUT_EXTRUDE8_DEPTH, mode=Mode.SUBTRACT)

    # Sketch25 → Cut-Extrude15 (cut)
    with BuildSketch(Plane(origin=(0, 0, 0), x_dir=(0, -1, 0), z_dir=(-0.9455185755993166, 0, -0.32556815445715737)).offset(CUT_EXTRUDE15_START)):
        with Locations(Location((-31.2, 0, 0), (0, 0, 90))):
            Circle(SKETCH25_R)
    extrude(amount=-CUT_EXTRUDE15_DEPTH, mode=Mode.SUBTRACT)

    # Sketch20 → Boss-Extrude4 (add)
    with BuildSketch(Plane(origin=(0, 40.7, 0), x_dir=(1, 0, 0), z_dir=(0, 1, 0))):
        with Locations(Location((0, 0, 0), (0, 0, 270))):
            Circle(SKETCH20_R)
        with Locations(Location((0, 0, 0), (0, 0, 270))):
            Circle(SKETCH20_R_2, mode=Mode.SUBTRACT)
    extrude(amount=BOSS_EXTRUDE4_DEPTH)

    # Cut-Extrude17: up to this cylinder (the profile starts inside it)
    cut_extrude17_end = Plane(origin=(0, 44.2, 0), z_dir=(0, -1, 0)) * Cylinder(CUT_EXTRUDE17_END_RADIUS, 232.99, mode=Mode.PRIVATE)
    # Sketch28 → Cut-Extrude17 (cut, up to the surface)
    with BuildSketch(Plane(origin=(0, 0, 0), x_dir=(0, 0, -1), z_dir=(1, 0, 0)), mode=Mode.PRIVATE) as cut_extrude17_sk1:
        with Locations((0, 44.2)):
            Rectangle(SKETCH28_W, SKETCH28_H)
    cut_extrude17_tool1 = extrude(cut_extrude17_sk1.sketch, amount=-CUT_EXTRUDE17_REACH, mode=Mode.PRIVATE) & cut_extrude17_end
    add(cut_extrude17_tool1.solids().sort_by_distance((0, 44.2, 0))[0], mode=Mode.SUBTRACT)

    # Cut-Extrude17 direction 2: up to this cylinder (the profile starts inside it)
    cut_extrude17_direction_2_end = Plane(origin=(0, 44.2, 0), z_dir=(0, -1, 0)) * Cylinder(CUT_EXTRUDE17_DIRECTION_2_END_RADIUS, 232.99, mode=Mode.PRIVATE)
    # Sketch28 → Cut-Extrude17 direction 2 (cut, up to the surface)
    with BuildSketch(Plane(origin=(0, 0, 0), x_dir=(0, 0, -1), z_dir=(1, 0, 0)), mode=Mode.PRIVATE) as cut_extrude17_direction_2_sk1:
        with Locations((0, 44.2)):
            Rectangle(SKETCH28_W, SKETCH28_H)
    cut_extrude17_direction_2_tool1 = extrude(cut_extrude17_direction_2_sk1.sketch, amount=CUT_EXTRUDE17_DIRECTION_2_REACH, mode=Mode.PRIVATE) & cut_extrude17_direction_2_end
    add(cut_extrude17_direction_2_tool1.solids().sort_by_distance((0, 44.2, 0))[0], mode=Mode.SUBTRACT)


solid = part.part
